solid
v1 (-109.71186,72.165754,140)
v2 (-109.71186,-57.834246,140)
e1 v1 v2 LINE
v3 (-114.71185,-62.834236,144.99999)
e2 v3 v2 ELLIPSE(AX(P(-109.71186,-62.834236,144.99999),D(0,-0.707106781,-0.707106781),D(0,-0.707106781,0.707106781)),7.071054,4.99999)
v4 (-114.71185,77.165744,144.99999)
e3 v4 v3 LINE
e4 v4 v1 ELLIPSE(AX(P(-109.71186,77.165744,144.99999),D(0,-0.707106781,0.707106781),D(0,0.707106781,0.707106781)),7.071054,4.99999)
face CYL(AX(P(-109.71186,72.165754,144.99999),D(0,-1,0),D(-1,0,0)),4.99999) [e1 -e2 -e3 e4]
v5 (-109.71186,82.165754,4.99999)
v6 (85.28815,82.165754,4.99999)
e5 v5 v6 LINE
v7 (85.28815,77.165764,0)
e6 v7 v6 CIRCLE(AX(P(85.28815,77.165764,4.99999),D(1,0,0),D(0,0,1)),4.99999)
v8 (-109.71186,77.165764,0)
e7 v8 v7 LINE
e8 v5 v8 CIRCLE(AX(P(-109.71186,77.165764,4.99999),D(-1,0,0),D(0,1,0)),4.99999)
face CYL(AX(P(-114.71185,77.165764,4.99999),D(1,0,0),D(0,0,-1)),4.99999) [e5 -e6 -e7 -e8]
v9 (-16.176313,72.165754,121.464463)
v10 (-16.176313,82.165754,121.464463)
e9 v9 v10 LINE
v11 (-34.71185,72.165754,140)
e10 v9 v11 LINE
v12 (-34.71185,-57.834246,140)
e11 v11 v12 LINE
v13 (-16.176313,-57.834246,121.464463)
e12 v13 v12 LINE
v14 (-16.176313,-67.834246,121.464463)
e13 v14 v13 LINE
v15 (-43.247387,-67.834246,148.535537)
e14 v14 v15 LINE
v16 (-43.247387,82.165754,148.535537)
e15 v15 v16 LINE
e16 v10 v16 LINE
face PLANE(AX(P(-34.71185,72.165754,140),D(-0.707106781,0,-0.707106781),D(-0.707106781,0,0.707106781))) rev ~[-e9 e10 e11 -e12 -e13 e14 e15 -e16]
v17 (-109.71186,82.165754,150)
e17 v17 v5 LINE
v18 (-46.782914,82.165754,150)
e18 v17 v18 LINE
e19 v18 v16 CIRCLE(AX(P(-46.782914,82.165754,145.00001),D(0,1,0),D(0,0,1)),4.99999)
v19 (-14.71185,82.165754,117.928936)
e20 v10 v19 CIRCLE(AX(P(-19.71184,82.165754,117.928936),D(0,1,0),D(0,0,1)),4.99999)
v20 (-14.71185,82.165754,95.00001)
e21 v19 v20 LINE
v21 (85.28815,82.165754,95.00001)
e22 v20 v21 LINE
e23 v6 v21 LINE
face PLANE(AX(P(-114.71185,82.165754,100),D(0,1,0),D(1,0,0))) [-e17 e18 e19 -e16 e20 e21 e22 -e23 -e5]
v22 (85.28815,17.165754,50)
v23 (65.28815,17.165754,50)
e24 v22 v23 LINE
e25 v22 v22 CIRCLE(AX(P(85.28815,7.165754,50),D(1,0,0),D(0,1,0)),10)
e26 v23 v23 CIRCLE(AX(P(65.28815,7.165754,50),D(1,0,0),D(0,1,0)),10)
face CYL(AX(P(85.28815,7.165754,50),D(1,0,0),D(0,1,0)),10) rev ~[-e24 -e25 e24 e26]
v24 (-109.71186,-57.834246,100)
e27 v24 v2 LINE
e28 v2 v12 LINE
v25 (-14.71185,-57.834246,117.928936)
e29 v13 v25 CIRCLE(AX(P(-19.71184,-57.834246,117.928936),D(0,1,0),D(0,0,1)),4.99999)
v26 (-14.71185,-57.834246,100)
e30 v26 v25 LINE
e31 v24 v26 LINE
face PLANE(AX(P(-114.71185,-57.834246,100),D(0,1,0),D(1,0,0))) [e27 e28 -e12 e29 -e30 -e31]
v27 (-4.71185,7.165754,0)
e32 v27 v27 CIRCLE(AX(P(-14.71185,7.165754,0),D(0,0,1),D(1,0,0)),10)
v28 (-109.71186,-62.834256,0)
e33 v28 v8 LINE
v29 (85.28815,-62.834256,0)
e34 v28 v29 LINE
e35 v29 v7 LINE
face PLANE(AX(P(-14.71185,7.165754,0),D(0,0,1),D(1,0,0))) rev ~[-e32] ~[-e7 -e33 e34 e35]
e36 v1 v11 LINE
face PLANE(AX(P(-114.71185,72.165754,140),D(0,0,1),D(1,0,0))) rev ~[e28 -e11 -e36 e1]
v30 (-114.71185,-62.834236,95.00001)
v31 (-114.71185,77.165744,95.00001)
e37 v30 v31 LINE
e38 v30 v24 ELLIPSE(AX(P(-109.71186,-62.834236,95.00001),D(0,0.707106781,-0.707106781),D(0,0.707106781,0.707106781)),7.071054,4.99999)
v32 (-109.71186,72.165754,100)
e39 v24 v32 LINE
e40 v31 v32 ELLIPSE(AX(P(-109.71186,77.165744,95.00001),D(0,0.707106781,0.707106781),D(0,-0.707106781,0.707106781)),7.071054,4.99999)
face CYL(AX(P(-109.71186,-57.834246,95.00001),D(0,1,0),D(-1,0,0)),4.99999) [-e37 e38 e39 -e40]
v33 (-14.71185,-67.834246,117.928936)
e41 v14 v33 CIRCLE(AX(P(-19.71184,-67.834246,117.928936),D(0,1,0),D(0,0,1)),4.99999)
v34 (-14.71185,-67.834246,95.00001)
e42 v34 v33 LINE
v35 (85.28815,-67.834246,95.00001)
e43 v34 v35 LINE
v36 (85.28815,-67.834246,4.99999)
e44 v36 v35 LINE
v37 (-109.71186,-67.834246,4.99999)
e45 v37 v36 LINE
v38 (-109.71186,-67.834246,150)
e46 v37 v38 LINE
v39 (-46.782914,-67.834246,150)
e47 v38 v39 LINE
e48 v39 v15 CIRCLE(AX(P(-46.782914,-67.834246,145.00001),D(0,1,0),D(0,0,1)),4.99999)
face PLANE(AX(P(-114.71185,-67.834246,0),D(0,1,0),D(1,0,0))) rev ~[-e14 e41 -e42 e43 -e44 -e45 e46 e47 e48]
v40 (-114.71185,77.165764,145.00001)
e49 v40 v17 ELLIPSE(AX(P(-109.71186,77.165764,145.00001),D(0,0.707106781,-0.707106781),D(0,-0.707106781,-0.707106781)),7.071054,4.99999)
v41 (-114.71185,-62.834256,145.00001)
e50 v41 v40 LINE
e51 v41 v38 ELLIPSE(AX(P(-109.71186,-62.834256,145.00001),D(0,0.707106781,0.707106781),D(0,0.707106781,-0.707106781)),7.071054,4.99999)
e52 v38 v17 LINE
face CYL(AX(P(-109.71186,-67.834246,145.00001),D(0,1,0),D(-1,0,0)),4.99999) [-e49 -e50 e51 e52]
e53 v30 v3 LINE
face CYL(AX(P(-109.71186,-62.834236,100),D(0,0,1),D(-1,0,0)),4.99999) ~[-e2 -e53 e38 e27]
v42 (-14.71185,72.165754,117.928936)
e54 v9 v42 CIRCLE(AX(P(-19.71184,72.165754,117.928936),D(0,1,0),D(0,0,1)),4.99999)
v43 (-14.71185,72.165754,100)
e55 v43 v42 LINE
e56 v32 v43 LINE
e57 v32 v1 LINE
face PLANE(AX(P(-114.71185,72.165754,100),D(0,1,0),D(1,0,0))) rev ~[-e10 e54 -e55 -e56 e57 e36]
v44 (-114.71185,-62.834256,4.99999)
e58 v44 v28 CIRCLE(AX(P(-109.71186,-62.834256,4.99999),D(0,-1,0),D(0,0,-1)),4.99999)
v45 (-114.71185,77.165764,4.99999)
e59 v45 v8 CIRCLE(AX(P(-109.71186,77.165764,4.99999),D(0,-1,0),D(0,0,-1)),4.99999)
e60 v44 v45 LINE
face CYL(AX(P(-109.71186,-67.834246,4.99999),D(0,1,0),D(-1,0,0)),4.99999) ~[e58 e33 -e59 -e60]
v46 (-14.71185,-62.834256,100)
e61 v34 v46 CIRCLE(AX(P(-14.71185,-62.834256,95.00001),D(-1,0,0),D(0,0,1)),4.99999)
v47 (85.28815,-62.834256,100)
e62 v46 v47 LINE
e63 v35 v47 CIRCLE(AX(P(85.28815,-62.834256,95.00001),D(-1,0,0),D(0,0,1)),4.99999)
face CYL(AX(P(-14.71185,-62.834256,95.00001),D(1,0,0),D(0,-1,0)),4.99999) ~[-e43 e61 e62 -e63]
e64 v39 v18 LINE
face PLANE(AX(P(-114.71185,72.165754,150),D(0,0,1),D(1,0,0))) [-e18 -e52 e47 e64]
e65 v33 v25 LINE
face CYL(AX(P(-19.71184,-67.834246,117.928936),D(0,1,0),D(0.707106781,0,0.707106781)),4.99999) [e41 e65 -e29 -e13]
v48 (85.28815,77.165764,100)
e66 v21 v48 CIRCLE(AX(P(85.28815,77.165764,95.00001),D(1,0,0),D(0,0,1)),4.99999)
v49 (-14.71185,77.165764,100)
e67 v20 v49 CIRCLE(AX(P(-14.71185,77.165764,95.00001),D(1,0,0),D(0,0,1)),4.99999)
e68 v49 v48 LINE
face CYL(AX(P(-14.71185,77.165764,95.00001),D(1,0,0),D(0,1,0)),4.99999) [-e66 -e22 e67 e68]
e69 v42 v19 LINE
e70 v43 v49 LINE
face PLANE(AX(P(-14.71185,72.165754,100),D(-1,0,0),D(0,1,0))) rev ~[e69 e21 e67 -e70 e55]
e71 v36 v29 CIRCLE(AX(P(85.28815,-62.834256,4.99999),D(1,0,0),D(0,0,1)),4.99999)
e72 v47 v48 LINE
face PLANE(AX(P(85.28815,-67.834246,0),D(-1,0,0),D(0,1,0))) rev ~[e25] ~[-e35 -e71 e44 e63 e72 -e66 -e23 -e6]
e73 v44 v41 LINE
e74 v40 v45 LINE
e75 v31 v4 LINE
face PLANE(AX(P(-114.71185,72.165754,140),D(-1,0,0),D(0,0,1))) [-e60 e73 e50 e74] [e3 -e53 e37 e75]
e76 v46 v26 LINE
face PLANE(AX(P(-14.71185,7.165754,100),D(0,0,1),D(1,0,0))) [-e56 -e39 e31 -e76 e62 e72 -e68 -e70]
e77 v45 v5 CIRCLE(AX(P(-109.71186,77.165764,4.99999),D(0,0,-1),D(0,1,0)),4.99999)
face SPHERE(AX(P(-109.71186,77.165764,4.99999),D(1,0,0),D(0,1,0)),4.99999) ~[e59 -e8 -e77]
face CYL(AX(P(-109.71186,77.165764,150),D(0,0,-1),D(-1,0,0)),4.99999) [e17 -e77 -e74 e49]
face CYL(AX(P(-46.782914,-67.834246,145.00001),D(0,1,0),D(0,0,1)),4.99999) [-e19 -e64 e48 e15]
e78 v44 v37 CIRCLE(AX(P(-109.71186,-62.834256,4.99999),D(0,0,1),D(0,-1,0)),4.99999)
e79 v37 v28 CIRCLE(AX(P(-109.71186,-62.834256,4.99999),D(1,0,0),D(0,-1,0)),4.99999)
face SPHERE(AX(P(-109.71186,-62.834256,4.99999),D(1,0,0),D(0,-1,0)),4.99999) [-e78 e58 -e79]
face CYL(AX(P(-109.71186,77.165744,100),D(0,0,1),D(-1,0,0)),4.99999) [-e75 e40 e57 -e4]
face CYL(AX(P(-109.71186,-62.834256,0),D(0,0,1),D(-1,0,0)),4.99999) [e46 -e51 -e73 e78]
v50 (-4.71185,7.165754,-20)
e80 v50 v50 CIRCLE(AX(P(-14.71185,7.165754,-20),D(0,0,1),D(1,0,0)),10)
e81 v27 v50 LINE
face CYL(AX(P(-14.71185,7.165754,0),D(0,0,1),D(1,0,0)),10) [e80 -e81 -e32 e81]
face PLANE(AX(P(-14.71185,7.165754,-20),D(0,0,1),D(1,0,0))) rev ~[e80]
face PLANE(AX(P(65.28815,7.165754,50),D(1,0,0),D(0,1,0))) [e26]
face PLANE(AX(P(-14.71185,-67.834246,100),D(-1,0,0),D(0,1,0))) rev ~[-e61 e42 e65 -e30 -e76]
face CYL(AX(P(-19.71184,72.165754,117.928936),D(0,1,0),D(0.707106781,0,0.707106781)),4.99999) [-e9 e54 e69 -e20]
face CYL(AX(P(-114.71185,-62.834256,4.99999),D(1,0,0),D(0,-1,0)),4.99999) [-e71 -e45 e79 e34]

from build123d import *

# Parameters (mm, degrees)
F0_W      = 200
F0_H      = 150
F0_R      = 10
F1_DEPTH  = 100
F2_DEPTH  = 20
F3_W      = 100
F3_H      = 10
F4_DEPTH  = 50
F5_SIZE   = 30
F6_W      = 70
F6_H      = 10
F7_DEPTH  = 130
F8_R      = 4.99999
F9_R      = 10
F10_DEPTH = 20


# Not quite as in the source:
# - a fillet or chamfer is up to 0.001 mm smaller than in the source, because OpenCascade refuses the exact size


with BuildPart() as f1:
    # F0 (on Top) → F1 (new body)
    with BuildSketch(Plane.XY):
        with Locations((-14.7118499619, 7.1657538414)):
            Rectangle(F0_W, F0_H)
        with Locations((-14.7118499619, 7.1657538414)):
            Circle(F0_R, mode=Mode.SUBTRACT)
        with Locations((-14.7118499619, 7.1657538414)):
            Circle(F0_R)
    extrude(amount=F1_DEPTH)

    # F0 (on Top) → F2 (join)
    with BuildSketch(Plane.XY):
        with Locations((-14.7118499619, 7.1657538414)):
            Circle(F0_R)
    extrude(amount=-F2_DEPTH)

    # F3 (on face) → F4 (join)
    with BuildSketch(Plane.XY.offset(100)):
        with Locations((-64.7118499619, 77.1657538414)):
            Rectangle(F3_W, F3_H)
        with Locations((-64.7118499619, -62.8342461586)):
            Rectangle(F3_W, F3_H)
    extrude(amount=F4_DEPTH)

    # F5
    f5_edges = [f1.edges().sort_by_distance(p)[0] for p in [
        (-14.71185, -62.834246, 150),
        (-14.71185, 77.165754, 150),
    ]]
    chamfer(f5_edges, length=F5_SIZE)

    # F6 (on face) → F7 (join)
    with BuildSketch(Plane.XZ.offset(-72.1657538414)):
        with Locations((-79.7118499619, 145)):
            Rectangle(F6_W, F6_H)
        Polygon((-34.7118499619, 140), (-44.7118499619, 150), (-44.7118499619, 140), align=None)
    extrude(amount=F7_DEPTH)

    # F8 (radius 5 in the source; OpenCascade refuses exactly that, so slightly less here)
    f8_edges = [f1.edges().sort_by_distance(p)[0] for p in [
        (35.28815, 82.165754, 100),
        (35.28815, -67.834246, 100),
        (-14.71185, 82.165754, 0),
        (-14.71185, -67.834246, 0),
        (-114.71185, 82.165754, 75),
        (-114.71185, 7.165754, 150),
        (-114.71185, -67.834246, 75),
        (-114.71185, 7.165754, 0),
        (-114.71185, 72.165754, 120),
        (-114.71185, 7.165754, 100),
        (-114.71185, -57.834246, 120),
        (-114.71185, 7.165754, 140),
        (-14.71185, -62.834246, 120),
        (-44.71185, 7.165754, 150),
        (-14.71185, 77.165754, 120),
    ]]
    fillet(f8_edges, radius=F8_R)

    # F9 (on face) → F10 (cut)
    with BuildSketch(Plane.YZ.offset(85.2881500381)):
        with Locations((7.1657538414, 50)):
            Circle(F9_R)
    extrude(amount=-F10_DEPTH, mode=Mode.SUBTRACT)


solid = f1.part
